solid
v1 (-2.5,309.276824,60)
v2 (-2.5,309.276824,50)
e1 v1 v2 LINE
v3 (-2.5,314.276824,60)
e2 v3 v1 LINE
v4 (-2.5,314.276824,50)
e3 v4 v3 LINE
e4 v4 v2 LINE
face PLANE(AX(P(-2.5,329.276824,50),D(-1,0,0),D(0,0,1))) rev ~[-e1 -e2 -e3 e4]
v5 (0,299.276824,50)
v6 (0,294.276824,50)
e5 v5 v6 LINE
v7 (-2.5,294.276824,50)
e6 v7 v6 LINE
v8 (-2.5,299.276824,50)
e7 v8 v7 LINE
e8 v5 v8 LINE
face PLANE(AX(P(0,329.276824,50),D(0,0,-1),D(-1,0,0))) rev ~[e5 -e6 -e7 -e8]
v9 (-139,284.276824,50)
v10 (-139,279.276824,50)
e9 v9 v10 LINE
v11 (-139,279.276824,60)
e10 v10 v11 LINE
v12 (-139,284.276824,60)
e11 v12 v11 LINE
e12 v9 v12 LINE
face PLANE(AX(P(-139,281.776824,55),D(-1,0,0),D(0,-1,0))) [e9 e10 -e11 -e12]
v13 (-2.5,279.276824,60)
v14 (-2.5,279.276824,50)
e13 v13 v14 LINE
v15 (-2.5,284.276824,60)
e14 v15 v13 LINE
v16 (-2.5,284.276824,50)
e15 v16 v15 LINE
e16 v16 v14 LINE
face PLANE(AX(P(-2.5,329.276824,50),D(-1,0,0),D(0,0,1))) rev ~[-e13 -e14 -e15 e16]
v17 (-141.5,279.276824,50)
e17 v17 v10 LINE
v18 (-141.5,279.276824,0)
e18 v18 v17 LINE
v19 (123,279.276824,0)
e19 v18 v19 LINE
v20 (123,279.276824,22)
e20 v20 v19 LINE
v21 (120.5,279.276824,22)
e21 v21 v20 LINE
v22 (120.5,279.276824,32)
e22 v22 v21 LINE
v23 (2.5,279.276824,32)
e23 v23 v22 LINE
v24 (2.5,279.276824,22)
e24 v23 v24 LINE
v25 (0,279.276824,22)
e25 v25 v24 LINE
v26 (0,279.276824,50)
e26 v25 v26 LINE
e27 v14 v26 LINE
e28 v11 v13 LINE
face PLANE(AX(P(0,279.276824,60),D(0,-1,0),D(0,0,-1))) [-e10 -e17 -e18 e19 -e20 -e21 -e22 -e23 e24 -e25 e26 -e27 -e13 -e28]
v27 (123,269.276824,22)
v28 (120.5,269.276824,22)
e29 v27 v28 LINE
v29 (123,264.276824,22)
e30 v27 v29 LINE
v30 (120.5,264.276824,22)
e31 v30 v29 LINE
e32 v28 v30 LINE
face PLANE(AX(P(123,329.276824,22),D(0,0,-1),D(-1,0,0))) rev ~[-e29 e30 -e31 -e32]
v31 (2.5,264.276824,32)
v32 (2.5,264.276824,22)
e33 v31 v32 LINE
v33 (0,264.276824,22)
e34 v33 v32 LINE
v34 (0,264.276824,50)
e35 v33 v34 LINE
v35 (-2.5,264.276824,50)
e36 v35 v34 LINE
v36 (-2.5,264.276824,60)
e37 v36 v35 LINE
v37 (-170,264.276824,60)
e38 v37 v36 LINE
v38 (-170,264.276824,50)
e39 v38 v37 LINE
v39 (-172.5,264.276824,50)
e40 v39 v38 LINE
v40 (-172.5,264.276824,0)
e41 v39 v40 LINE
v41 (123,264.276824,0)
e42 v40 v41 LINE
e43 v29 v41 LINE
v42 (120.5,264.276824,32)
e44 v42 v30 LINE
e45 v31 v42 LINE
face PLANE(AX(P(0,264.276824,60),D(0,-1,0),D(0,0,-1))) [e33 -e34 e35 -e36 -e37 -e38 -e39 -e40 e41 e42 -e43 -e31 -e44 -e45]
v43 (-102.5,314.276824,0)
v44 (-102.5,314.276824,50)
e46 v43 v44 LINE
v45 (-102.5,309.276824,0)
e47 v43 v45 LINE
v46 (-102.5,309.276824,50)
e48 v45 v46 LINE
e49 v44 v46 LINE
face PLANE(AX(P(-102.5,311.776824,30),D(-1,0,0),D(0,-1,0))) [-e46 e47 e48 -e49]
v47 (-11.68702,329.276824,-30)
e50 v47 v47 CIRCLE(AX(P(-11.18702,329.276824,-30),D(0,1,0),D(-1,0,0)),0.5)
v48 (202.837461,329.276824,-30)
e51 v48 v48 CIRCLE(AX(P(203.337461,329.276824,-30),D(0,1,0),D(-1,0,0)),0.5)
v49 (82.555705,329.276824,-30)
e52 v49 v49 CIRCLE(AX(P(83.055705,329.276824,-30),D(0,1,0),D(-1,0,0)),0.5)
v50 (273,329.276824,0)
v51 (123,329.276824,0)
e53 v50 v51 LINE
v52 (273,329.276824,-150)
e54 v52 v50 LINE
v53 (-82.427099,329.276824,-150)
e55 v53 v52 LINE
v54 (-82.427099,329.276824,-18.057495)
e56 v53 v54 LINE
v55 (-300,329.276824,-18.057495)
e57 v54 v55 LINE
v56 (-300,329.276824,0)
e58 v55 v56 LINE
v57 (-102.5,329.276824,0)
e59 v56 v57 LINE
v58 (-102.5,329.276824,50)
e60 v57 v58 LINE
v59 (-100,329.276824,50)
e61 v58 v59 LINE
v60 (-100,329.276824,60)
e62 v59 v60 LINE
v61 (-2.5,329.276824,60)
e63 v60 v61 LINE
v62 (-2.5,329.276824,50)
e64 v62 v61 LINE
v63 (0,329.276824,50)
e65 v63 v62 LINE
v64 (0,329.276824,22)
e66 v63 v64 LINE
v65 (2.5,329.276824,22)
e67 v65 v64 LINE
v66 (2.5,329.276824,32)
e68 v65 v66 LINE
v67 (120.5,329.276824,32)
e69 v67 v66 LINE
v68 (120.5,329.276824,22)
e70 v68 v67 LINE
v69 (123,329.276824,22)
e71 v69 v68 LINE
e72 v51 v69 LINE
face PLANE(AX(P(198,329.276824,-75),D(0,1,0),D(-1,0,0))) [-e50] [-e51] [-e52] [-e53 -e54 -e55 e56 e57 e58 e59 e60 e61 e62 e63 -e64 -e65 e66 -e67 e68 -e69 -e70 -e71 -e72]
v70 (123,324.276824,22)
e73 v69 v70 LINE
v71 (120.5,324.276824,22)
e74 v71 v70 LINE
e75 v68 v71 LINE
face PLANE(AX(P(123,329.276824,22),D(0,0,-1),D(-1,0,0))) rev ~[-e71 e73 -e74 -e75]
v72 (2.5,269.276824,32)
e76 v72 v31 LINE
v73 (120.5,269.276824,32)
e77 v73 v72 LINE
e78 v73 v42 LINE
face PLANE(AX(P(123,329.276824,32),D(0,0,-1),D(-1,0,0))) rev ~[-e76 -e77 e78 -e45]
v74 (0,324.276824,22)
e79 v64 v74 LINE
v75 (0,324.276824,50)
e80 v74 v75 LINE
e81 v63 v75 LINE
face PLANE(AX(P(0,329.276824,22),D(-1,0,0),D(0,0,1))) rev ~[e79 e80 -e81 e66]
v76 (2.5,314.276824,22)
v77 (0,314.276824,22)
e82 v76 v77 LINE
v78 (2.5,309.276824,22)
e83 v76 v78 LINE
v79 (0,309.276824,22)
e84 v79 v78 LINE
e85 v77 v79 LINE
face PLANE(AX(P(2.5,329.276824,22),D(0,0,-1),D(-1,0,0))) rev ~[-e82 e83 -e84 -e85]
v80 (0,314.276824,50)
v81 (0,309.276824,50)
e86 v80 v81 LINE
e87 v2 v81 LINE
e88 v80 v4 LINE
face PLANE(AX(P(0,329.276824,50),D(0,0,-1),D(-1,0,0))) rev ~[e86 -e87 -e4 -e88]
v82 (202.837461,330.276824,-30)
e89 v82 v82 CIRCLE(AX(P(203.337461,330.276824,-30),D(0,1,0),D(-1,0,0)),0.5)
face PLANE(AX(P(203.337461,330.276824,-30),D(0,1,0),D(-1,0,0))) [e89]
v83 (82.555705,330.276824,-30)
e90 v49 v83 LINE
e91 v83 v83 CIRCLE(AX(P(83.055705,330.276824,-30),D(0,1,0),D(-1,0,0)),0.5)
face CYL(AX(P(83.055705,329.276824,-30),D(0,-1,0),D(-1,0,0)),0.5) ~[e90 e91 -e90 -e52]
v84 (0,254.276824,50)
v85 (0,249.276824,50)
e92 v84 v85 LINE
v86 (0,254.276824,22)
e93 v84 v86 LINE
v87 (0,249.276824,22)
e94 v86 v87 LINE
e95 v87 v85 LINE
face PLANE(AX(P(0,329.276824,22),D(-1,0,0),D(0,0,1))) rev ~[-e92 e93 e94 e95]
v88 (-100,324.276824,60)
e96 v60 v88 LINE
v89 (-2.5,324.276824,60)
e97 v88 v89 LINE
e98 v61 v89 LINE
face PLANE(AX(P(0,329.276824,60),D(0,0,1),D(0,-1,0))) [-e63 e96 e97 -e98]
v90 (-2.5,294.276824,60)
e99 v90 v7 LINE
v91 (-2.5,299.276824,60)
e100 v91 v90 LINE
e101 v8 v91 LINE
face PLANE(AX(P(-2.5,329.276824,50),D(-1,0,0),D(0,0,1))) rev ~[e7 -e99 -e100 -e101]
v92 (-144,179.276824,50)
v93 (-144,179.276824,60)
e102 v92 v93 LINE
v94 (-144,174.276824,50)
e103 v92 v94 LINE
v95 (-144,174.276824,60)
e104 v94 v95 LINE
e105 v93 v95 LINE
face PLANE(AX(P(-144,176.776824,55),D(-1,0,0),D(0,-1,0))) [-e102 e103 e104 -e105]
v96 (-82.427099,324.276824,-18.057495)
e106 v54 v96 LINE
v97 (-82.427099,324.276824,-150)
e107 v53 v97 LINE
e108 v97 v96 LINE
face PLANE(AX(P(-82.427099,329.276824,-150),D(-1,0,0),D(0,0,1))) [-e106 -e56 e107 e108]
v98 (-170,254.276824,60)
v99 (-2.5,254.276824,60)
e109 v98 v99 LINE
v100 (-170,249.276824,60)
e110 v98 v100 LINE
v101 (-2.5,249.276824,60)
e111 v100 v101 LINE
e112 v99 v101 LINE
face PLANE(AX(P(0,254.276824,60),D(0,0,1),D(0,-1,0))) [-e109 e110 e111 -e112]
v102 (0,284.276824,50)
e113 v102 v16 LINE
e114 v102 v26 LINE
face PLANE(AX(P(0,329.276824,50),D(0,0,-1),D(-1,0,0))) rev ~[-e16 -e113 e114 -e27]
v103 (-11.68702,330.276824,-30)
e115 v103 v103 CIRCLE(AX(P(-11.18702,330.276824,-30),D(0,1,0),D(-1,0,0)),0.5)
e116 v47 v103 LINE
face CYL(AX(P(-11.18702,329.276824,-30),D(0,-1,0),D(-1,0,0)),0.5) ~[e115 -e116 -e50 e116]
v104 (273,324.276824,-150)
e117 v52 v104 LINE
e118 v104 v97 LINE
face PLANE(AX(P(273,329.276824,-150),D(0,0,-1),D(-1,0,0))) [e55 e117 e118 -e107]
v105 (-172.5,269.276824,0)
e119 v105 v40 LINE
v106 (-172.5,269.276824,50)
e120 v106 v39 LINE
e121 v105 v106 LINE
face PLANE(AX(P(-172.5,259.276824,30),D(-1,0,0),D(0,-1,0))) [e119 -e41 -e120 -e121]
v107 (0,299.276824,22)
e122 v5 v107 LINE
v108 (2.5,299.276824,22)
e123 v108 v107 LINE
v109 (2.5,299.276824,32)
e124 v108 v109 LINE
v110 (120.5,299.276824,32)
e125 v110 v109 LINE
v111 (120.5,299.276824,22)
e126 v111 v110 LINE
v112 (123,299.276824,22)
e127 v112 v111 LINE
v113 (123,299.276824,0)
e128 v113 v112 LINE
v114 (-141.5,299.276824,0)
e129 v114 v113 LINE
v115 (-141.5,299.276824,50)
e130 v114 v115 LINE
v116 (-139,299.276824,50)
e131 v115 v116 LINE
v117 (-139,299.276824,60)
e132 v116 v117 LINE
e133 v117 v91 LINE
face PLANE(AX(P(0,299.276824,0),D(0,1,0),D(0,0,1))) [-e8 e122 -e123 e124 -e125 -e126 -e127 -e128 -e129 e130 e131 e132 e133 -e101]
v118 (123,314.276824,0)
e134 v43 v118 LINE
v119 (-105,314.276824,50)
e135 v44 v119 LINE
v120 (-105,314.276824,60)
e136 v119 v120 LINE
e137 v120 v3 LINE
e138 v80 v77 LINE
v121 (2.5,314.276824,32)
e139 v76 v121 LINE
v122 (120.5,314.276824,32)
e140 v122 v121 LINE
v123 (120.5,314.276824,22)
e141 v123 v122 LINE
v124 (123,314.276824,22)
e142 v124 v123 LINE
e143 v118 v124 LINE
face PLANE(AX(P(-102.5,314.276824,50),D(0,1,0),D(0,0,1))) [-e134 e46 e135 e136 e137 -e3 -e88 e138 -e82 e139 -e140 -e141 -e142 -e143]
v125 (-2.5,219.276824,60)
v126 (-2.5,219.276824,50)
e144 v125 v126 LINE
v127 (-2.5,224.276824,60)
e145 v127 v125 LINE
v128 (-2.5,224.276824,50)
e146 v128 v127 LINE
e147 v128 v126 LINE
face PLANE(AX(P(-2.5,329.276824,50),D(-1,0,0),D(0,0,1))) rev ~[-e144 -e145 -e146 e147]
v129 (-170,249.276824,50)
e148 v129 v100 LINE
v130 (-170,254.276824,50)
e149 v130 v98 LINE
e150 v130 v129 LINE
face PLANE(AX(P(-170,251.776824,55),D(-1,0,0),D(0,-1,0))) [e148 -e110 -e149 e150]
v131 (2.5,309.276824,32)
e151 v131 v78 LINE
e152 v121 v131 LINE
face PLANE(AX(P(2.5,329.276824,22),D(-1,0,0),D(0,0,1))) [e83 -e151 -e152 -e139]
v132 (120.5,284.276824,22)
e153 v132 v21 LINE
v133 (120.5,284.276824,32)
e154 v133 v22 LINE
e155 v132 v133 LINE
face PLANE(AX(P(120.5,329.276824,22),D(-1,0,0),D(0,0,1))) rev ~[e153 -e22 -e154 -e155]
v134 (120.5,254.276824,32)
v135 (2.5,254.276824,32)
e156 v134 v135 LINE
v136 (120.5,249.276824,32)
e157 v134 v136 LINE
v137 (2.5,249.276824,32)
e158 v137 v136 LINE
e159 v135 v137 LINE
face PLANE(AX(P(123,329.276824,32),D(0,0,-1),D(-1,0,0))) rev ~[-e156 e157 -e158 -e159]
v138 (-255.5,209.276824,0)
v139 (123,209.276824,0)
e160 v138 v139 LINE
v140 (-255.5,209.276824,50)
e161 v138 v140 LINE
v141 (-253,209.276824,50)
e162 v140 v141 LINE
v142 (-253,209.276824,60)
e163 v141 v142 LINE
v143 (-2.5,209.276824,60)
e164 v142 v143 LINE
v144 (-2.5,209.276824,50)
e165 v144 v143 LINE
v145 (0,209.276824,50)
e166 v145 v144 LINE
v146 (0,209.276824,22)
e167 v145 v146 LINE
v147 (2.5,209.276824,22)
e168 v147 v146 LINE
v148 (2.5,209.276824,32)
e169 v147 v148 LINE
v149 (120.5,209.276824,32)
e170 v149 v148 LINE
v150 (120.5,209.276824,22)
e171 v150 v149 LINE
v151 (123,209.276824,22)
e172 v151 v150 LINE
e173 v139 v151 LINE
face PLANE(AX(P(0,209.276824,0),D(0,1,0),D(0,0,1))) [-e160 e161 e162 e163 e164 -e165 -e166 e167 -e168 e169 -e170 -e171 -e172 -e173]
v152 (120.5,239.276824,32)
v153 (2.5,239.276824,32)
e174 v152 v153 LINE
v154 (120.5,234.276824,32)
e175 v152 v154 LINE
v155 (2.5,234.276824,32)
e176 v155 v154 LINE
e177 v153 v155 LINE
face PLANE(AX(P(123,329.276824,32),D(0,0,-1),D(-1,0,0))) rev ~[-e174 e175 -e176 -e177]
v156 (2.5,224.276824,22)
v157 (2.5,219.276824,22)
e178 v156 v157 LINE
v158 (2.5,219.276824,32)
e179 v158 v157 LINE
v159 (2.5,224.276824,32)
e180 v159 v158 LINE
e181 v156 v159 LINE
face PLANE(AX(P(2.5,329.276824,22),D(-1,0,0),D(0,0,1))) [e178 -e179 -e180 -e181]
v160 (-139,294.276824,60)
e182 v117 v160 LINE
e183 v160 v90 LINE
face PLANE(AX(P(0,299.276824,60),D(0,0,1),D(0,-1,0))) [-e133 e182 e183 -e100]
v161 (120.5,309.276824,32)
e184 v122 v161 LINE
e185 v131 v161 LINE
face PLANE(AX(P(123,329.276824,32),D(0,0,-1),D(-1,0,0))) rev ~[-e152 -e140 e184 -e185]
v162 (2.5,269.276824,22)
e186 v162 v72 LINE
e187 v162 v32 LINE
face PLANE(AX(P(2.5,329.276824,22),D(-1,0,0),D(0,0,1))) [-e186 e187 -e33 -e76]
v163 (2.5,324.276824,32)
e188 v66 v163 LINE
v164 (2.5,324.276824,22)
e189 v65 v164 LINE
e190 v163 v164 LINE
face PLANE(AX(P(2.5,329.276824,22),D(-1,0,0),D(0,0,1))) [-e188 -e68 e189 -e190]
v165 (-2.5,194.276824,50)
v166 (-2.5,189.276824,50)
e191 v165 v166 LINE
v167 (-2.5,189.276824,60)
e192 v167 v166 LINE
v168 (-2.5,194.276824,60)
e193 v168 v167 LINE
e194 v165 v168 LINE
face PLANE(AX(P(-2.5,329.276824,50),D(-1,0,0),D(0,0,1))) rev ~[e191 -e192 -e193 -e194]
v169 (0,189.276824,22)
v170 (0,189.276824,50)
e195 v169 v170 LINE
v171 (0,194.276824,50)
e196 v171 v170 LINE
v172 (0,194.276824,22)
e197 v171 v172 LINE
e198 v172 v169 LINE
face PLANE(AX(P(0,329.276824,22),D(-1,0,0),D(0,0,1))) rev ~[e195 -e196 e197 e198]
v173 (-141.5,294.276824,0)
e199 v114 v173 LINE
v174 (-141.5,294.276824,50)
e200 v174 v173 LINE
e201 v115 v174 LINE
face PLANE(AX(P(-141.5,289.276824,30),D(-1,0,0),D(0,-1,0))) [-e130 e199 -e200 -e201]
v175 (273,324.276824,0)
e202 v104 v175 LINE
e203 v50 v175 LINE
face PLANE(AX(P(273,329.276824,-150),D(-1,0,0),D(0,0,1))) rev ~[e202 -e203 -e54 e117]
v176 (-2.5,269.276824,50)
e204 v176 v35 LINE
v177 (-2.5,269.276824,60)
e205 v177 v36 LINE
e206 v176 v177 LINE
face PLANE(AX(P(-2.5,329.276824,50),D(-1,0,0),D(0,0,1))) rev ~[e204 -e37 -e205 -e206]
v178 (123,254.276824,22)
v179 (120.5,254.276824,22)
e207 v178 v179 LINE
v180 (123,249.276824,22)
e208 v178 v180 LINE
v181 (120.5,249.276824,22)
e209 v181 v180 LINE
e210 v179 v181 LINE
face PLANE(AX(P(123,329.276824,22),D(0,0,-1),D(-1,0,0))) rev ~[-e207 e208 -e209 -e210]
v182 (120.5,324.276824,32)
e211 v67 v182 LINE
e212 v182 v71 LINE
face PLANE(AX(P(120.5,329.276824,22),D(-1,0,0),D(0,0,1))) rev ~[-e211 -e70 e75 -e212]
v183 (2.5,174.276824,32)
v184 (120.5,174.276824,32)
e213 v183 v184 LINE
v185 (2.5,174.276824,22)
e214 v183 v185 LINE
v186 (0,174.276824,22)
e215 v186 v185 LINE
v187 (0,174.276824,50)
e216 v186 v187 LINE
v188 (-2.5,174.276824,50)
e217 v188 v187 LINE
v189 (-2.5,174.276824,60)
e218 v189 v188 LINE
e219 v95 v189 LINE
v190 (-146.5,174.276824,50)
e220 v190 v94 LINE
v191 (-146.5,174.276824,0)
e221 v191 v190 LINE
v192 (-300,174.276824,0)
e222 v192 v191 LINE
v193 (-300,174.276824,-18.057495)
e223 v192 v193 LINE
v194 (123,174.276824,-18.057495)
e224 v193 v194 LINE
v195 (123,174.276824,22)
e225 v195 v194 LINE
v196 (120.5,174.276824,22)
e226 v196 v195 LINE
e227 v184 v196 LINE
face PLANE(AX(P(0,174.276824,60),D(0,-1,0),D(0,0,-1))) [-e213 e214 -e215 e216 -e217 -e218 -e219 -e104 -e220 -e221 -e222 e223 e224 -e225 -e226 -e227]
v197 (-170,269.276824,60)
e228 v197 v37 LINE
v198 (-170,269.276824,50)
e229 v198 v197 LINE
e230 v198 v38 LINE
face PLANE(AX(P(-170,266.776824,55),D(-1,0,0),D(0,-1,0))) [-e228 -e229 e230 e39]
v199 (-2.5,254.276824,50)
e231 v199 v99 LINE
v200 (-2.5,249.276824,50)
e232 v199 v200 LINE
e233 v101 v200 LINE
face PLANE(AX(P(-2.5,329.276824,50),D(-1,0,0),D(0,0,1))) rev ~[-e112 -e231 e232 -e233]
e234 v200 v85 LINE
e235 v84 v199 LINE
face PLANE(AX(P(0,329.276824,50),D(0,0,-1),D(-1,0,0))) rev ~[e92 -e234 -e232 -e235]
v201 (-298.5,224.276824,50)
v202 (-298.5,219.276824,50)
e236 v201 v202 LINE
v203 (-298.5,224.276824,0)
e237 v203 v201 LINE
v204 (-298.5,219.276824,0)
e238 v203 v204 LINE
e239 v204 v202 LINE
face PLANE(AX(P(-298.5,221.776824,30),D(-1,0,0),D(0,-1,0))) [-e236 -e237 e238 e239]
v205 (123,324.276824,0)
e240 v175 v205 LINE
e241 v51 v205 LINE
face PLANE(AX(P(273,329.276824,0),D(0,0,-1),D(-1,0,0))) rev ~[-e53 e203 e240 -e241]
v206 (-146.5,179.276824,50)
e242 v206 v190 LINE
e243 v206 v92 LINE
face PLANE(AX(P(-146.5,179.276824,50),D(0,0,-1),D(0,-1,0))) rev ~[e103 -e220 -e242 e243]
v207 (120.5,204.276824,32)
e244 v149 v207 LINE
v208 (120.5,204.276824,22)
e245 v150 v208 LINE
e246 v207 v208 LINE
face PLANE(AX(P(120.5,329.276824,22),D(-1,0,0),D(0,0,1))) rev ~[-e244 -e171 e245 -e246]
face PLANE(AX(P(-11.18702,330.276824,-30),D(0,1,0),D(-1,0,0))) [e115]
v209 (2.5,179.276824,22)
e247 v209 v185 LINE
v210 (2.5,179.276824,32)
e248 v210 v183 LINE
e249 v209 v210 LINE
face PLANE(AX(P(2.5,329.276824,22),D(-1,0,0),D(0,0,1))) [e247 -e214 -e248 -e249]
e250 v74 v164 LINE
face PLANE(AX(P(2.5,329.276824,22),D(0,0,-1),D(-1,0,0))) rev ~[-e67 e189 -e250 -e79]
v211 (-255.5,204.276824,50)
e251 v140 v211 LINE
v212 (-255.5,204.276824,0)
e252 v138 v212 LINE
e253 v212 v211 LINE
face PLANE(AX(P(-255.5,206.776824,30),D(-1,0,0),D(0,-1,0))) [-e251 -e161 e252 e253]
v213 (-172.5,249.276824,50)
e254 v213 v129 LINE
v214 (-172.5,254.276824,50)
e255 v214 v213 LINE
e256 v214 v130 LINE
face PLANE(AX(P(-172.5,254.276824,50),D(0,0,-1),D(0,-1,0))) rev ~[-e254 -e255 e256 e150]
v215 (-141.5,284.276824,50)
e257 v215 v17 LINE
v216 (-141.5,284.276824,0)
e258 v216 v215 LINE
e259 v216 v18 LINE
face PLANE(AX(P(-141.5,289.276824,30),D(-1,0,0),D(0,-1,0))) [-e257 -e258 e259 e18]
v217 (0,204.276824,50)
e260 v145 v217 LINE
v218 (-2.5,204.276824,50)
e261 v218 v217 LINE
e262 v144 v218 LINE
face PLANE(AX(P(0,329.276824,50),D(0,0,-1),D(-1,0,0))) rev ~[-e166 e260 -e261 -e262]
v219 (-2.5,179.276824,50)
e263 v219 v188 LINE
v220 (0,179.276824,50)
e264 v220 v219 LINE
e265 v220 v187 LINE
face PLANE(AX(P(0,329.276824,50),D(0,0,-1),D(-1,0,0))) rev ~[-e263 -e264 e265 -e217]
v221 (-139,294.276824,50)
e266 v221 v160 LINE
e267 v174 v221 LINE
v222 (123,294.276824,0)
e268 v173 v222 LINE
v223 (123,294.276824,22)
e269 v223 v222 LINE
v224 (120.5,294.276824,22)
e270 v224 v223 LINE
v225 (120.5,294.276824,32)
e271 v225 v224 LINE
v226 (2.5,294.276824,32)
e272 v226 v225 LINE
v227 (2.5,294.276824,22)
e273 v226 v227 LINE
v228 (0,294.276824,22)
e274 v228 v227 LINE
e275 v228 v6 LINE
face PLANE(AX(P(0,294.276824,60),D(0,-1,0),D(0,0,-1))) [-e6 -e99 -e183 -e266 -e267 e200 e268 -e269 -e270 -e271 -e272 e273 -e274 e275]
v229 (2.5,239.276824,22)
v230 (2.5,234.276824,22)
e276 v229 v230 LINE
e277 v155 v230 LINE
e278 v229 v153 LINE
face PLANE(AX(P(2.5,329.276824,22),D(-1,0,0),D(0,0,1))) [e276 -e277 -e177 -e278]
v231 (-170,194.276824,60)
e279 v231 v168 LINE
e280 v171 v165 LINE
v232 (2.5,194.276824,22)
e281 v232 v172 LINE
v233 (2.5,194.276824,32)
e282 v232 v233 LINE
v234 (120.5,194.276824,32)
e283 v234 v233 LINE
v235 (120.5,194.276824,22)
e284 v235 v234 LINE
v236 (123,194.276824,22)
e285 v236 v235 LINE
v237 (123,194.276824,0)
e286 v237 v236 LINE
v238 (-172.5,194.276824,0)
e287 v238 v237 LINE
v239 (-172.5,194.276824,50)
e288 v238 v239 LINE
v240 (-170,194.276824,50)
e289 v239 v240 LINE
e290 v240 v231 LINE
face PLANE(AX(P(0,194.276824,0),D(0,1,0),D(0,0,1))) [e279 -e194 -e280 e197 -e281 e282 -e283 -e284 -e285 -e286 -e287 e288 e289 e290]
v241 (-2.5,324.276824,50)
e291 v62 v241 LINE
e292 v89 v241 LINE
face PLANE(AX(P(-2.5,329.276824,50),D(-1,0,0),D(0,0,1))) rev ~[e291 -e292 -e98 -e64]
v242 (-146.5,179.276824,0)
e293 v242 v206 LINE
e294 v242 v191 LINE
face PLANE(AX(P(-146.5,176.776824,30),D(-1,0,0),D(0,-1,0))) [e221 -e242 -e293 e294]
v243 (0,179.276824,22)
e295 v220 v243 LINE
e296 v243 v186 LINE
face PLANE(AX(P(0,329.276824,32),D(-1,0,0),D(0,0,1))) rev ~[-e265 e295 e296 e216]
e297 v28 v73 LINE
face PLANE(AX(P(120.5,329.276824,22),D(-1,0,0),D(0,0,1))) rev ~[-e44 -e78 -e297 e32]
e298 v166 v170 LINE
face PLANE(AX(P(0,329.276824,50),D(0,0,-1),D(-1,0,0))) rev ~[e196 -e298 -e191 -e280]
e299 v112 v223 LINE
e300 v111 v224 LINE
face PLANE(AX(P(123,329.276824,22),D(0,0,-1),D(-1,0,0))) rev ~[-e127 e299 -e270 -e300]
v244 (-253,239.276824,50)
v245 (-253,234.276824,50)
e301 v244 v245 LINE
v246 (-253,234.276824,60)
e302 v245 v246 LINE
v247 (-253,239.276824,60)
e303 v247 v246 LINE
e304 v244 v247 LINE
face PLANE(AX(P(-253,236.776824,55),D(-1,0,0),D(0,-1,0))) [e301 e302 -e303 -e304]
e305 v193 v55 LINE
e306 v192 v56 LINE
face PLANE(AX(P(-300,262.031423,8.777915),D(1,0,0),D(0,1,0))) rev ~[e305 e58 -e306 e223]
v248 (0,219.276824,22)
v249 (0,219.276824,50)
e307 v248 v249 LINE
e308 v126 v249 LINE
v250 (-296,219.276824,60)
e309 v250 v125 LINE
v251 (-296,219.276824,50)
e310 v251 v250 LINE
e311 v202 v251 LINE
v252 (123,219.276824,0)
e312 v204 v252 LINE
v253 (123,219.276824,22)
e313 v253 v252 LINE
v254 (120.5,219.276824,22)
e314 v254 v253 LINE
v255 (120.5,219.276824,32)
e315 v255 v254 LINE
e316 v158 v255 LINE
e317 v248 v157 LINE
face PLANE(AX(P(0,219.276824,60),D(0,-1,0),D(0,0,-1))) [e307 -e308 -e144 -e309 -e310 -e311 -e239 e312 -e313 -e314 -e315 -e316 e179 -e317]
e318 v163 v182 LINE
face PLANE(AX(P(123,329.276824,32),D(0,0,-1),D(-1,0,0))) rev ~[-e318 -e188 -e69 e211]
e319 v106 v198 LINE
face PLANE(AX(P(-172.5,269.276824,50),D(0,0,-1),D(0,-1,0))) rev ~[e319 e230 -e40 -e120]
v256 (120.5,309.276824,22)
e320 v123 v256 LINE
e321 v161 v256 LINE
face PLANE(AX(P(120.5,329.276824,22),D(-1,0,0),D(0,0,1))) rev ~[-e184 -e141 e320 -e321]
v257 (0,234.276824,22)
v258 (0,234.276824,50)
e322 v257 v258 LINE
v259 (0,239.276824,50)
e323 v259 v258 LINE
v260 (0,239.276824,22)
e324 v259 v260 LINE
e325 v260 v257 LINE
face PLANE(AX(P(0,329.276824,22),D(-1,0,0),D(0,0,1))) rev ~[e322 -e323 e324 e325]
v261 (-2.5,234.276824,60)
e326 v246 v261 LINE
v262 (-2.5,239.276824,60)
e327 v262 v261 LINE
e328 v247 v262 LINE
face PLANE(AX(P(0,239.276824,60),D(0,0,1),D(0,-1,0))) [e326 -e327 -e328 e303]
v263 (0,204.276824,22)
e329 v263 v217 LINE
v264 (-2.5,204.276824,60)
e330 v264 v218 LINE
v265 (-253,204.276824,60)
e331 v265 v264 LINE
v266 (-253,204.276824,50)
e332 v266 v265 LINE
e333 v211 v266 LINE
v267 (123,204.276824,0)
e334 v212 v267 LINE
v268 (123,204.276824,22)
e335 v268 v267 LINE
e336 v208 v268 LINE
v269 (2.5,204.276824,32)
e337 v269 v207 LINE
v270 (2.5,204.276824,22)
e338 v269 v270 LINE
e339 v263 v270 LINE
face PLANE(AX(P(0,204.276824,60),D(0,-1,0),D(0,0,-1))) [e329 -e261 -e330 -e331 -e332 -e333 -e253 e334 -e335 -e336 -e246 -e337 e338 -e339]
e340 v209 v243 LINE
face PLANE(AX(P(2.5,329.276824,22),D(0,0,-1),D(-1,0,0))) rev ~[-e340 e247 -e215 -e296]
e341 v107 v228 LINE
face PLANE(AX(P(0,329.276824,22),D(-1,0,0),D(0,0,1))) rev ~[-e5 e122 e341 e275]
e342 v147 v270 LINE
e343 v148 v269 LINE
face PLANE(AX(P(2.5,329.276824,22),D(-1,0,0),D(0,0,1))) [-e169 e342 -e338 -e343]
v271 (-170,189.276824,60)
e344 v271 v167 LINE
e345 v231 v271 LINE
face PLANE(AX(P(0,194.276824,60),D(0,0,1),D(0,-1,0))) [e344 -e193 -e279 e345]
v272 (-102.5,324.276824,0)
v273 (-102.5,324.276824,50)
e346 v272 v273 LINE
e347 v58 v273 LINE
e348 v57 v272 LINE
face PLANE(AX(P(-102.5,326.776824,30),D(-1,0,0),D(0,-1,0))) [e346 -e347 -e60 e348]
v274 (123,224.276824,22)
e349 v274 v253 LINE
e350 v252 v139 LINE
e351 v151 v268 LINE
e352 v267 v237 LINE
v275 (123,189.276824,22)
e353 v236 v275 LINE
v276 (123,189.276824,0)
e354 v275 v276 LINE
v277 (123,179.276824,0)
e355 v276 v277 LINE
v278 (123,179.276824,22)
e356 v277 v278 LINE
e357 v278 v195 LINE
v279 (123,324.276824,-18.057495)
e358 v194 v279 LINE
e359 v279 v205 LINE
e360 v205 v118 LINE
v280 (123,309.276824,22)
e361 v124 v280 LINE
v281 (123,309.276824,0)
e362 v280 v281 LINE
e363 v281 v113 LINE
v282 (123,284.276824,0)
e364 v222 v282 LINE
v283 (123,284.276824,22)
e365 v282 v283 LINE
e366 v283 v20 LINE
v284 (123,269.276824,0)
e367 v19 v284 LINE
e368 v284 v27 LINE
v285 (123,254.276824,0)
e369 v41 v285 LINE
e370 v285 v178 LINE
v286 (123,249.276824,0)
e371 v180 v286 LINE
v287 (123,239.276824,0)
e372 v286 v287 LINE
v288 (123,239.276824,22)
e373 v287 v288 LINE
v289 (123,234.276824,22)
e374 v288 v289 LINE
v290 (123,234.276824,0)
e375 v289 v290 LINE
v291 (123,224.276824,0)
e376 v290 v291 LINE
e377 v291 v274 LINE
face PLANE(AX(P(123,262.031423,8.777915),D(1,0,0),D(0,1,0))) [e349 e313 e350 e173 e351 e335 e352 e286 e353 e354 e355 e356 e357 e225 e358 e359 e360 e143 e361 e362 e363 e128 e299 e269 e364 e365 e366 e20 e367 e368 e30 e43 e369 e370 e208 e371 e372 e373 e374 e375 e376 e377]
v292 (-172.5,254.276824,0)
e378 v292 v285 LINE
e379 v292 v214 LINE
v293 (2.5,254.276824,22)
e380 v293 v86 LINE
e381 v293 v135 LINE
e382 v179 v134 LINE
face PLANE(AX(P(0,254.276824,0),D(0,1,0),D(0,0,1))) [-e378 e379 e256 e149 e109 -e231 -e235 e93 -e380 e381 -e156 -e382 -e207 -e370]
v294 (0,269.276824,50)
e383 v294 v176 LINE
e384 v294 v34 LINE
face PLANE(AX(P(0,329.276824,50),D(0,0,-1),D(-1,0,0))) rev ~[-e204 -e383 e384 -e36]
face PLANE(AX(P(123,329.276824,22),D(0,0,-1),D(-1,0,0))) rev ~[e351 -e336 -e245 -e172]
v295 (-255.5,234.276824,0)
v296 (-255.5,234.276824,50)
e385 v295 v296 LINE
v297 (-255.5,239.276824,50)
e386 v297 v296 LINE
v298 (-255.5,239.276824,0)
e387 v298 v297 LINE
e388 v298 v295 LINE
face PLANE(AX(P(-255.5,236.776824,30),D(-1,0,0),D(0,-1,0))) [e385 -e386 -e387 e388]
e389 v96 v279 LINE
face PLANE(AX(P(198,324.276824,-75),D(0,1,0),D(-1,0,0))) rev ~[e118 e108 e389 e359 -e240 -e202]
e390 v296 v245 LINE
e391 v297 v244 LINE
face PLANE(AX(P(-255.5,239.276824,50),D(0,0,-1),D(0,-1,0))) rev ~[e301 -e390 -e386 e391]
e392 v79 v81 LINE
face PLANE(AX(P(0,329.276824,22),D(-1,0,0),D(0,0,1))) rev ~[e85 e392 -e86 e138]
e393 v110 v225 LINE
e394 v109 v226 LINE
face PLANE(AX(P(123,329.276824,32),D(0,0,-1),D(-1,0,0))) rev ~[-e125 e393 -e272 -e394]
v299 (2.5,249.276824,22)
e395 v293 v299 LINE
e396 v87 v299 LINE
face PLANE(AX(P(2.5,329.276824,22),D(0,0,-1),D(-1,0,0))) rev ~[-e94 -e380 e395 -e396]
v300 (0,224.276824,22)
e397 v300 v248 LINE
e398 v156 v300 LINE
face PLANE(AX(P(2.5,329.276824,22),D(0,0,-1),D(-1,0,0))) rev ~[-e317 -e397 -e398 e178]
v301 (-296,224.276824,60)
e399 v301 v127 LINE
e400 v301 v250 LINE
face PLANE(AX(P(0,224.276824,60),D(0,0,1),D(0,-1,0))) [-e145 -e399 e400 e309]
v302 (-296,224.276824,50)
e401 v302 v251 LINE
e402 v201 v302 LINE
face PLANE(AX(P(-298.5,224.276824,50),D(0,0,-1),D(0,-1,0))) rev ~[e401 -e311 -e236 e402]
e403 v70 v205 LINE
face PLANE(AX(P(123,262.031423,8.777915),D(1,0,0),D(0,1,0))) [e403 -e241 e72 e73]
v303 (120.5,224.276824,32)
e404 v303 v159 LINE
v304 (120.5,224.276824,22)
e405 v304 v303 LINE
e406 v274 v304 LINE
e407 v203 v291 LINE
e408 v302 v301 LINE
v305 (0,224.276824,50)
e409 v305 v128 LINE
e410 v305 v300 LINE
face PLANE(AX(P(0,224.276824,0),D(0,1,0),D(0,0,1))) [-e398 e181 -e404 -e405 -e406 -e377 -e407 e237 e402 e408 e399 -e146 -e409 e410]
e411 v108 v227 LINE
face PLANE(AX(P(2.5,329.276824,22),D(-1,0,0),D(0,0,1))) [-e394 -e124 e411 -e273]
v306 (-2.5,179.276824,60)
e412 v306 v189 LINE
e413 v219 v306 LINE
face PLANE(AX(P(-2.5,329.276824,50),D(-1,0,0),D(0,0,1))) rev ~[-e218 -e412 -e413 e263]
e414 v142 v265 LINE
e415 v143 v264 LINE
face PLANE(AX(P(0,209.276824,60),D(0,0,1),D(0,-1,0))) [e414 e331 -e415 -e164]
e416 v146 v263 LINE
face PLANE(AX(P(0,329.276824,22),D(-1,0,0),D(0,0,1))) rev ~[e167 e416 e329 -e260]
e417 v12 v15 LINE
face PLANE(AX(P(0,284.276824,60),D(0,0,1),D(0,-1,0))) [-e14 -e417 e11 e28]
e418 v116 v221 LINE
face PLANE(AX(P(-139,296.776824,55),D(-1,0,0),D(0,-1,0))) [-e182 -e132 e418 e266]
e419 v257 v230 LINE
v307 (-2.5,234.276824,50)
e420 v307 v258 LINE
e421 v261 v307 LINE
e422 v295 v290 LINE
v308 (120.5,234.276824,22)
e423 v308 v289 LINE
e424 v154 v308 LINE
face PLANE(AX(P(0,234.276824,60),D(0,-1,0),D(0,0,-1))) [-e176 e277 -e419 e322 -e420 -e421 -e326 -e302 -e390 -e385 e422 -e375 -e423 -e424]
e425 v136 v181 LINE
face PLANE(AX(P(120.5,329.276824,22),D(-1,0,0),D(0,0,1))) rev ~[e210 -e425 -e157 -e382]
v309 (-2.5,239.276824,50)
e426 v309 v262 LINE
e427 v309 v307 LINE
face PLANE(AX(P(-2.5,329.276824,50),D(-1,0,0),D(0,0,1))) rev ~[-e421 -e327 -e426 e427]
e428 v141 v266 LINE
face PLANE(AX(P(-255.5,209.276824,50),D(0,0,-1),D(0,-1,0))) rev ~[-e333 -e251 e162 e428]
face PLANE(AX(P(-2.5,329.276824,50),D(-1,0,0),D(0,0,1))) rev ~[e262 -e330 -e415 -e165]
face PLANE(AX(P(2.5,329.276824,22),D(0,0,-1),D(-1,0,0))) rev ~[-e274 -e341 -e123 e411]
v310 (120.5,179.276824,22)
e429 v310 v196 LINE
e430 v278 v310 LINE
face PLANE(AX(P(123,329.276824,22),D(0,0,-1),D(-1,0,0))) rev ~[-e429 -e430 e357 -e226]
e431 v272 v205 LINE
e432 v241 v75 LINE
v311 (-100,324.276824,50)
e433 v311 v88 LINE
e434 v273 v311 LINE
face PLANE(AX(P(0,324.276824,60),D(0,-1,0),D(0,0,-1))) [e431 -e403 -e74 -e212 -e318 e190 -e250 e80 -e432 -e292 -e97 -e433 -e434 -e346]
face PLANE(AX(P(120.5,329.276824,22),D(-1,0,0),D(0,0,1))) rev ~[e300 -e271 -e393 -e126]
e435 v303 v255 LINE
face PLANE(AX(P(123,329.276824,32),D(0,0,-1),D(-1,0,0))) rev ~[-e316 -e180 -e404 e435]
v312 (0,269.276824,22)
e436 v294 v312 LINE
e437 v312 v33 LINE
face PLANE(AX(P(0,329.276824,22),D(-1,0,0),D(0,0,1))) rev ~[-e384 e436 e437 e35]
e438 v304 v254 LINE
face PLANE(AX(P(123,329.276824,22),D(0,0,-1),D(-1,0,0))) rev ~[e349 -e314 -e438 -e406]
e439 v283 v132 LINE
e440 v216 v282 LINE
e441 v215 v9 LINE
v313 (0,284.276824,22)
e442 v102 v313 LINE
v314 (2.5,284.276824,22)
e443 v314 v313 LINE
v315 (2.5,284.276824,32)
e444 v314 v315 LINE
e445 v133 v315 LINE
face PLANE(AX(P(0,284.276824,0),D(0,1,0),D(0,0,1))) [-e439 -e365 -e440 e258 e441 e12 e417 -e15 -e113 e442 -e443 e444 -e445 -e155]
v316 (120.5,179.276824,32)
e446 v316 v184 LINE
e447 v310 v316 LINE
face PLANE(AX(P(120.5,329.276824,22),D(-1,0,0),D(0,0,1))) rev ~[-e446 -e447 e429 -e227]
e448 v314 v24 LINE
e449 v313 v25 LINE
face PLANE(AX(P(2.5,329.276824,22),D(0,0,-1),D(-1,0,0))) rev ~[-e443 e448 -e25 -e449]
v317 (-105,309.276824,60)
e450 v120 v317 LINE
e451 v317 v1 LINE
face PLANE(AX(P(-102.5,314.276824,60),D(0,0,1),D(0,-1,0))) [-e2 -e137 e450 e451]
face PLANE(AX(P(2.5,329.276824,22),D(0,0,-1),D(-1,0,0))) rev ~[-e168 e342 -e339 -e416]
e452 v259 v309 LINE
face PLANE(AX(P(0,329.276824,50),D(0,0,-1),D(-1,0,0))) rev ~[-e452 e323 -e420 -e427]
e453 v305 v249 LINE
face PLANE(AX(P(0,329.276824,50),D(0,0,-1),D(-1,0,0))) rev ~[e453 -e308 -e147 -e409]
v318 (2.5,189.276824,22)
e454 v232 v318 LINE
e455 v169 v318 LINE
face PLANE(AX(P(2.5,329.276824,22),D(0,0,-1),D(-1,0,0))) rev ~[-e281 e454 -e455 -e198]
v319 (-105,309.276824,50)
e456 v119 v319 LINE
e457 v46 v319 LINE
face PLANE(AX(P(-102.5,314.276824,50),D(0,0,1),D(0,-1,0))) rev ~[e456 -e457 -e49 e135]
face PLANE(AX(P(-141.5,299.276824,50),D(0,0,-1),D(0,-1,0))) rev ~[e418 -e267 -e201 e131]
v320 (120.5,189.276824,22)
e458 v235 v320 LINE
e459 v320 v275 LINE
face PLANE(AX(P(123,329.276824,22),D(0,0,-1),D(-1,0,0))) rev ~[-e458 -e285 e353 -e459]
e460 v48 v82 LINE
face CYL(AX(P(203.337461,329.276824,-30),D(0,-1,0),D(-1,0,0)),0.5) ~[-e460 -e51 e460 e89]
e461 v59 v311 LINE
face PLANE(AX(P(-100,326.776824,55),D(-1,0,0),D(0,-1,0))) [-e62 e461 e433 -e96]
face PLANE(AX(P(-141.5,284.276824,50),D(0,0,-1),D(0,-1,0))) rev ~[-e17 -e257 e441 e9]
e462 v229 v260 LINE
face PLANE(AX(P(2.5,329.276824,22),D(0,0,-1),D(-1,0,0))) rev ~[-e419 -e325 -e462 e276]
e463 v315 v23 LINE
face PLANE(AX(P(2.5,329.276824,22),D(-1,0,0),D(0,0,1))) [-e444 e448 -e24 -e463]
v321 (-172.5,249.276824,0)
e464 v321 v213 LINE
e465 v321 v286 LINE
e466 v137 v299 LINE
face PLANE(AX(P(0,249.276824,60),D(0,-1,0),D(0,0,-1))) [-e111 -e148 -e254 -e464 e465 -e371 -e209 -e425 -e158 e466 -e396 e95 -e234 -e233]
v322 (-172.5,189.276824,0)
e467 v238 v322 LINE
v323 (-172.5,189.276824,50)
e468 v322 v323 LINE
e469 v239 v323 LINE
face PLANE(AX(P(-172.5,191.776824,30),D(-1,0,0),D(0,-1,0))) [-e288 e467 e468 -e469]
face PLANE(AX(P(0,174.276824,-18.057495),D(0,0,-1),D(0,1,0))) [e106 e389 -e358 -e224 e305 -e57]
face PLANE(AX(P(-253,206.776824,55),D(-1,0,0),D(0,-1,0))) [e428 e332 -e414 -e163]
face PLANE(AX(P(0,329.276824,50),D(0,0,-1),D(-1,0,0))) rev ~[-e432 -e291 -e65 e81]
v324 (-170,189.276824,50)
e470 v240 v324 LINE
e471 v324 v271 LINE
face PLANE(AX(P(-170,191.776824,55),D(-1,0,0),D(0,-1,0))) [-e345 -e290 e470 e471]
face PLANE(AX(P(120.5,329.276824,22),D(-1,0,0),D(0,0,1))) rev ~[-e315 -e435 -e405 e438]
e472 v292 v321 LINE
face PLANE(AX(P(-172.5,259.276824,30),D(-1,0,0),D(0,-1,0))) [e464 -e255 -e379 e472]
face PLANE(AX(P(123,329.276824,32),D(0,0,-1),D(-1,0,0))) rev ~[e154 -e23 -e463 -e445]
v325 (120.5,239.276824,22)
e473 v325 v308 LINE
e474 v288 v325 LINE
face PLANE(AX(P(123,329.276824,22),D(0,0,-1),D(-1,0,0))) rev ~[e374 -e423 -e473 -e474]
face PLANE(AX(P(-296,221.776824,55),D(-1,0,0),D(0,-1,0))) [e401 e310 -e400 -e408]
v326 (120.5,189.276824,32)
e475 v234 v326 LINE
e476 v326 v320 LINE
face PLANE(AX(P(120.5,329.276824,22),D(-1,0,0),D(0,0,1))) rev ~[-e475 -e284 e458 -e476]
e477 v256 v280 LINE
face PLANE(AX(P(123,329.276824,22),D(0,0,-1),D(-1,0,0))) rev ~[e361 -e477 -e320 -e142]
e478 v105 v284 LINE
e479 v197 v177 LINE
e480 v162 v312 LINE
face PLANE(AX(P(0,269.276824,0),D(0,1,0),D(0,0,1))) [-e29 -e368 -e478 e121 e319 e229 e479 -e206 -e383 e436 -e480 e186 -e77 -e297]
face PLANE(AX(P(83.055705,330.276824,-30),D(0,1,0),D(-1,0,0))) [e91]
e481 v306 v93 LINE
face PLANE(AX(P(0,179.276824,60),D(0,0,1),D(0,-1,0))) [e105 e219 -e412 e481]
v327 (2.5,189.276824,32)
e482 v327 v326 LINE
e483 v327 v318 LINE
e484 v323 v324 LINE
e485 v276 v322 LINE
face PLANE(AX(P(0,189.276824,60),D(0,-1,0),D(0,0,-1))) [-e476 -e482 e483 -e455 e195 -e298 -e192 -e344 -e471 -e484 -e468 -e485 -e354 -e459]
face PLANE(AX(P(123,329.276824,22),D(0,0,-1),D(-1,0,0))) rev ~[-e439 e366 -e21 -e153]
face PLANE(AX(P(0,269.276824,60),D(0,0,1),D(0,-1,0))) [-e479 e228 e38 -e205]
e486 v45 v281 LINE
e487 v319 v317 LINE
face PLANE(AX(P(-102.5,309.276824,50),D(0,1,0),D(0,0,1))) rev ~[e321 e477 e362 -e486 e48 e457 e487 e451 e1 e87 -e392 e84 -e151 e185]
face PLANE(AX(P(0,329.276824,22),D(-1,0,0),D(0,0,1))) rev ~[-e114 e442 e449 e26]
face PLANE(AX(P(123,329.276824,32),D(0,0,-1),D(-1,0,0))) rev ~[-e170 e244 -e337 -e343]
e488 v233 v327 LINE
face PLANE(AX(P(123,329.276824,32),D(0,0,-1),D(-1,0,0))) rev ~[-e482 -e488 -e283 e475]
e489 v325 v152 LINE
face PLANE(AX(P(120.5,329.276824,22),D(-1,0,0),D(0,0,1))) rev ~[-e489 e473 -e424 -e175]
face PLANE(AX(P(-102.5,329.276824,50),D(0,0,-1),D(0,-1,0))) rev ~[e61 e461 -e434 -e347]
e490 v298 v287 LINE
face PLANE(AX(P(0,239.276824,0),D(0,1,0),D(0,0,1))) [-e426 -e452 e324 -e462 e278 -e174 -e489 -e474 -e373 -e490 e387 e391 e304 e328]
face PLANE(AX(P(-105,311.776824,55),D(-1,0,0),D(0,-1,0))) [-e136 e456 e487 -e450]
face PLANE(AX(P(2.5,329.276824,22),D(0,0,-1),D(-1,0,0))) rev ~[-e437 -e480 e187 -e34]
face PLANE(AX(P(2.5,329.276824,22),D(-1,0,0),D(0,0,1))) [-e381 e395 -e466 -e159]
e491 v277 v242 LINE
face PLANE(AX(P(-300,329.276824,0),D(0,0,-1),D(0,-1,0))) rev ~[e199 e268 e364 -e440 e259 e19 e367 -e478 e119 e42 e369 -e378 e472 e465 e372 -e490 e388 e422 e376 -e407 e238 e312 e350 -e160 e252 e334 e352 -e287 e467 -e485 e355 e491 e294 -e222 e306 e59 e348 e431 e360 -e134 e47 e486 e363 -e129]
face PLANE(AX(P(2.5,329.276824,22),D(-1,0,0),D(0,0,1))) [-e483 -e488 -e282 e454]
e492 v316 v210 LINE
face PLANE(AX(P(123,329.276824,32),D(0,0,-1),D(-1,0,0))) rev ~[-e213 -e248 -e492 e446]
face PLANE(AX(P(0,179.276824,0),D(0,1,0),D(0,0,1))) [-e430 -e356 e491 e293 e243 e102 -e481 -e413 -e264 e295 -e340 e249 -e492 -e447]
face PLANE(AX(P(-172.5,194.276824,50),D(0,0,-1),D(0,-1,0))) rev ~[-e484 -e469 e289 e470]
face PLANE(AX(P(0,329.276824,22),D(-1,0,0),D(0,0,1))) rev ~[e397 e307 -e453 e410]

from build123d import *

# Parameters (mm, degrees)
F1_DEPTH  = 123
F2_DEPTH  = 300
F3_R      = 0.5
F4_DEPTH  = 1
F5_W      = 123
F5_H      = 28
F6_DEPTH  = 300
F7_W      = 2.5
F7_H      = 10
F8_DEPTH  = 300
F9_W      = 150
F9_H      = 150
F10_DEPTH = 5
F11_W     = 5
F11_H     = 60
F12_DEPTH = 197.5
F13_W     = 20
F13_H     = 60
F14_DEPTH = 158.5
F15_W     = 20
F15_H     = 60
F15_W_2   = 5
F16_DEPTH = 127.5
F17_W     = 5
F17_H     = 60
F18_DEPTH = 44.5
F19_W     = 5
F19_H     = 60
F20_DEPTH = 1.5
F21_W     = 5
F21_H     = 60
F22_DEPTH = 153.5
F23_W     = 5
F23_H     = 10
F24_DEPTH = 2.5
F25_W     = 5
F25_H     = 10
F26_DEPTH = 2.5
F27_W     = 5
F27_H     = 10
F28_DEPTH = 2.5
F29_W     = 5
F29_H     = 10
F30_DEPTH = 2.5
F31_W     = 5
F31_H     = 10
F32_DEPTH = 2.5
F33_W     = 5
F33_H     = 10
F34_DEPTH = 2.5
F35_W     = 5
F35_H     = 10
F36_DEPTH = 2.5
F37_W     = 5
F37_H     = 10
F38_DEPTH = 2.5
F39_W     = 5
F39_H     = 10
F40_DEPTH = 2.5
F41_W     = 5
F41_H     = 10
F42_DEPTH = 2.5
F43_W     = 5
F43_H     = 10
F44_DEPTH = 2.5
F45_W     = 217.5729006529
F45_H     = 131.9425046444
F46_DEPTH = 5


# Not quite as in the source:
# - a feature names something its author has since deleted; it is built from what else it names


with BuildPart() as f1:
    # F0 (on Right) → F1 (new body)
    with BuildSketch(Plane.YZ):
        Polygon((179.2768240368, 60), (174.2768240368, 60), (174.2768240368, -18.0574953556), (324.2768240368, -18.0574953556), (324.2768240368, -150), (329.2768240368, -150), (329.2768240368, 60), (324.2768240368, 60), (324.2768240368, 0), (314.2768240368, 0), (314.2768240368, 60), (309.2768240368, 60), (309.2768240368, 0), (299.2768240368, 0), (299.2768240368, 60), (294.2768240368, 60), (294.2768240368, 0), (284.2768240368, 0), (284.2768240368, 60), (279.2768240368, 60), (279.2768240368, 0), (269.2768240368, 0), (269.2768240368, 60), (264.2768240368, 60), (264.2768240368, 0), (254.2768240368, 0), (254.2768240368, 60), (249.2768240368, 60), (249.2768240368, 0), (239.2768240368, 0), (239.2768240368, 60), (234.2768240368, 60), (234.2768240368, 0), (224.2768240368, 0), (224.2768240368, 60), (219.2768240368, 60), (219.2768240368, 0), (209.2768240368, 0), (209.2768240368, 60), (204.2768240368, 60), (204.2768240368, 0), (194.2768240368, 0), (194.2768240368, 60), (189.2768240368, 60), (189.2768240368, 0), (179.2768240368, 0), align=None)
    extrude(amount=F1_DEPTH)

    # F0 (on Right) → F2 (join)
    with BuildSketch(Plane.YZ):
        Polygon((179.2768240368, 60), (174.2768240368, 60), (174.2768240368, -18.0574953556), (324.2768240368, -18.0574953556), (324.2768240368, -150), (329.2768240368, -150), (329.2768240368, 60), (324.2768240368, 60), (324.2768240368, 0), (314.2768240368, 0), (314.2768240368, 60), (309.2768240368, 60), (309.2768240368, 0), (299.2768240368, 0), (299.2768240368, 60), (294.2768240368, 60), (294.2768240368, 0), (284.2768240368, 0), (284.2768240368, 60), (279.2768240368, 60), (279.2768240368, 0), (269.2768240368, 0), (269.2768240368, 60), (264.2768240368, 60), (264.2768240368, 0), (254.2768240368, 0), (254.2768240368, 60), (249.2768240368, 60), (249.2768240368, 0), (239.2768240368, 0), (239.2768240368, 60), (234.2768240368, 60), (234.2768240368, 0), (224.2768240368, 0), (224.2768240368, 60), (219.2768240368, 60), (219.2768240368, 0), (209.2768240368, 0), (209.2768240368, 60), (204.2768240368, 60), (204.2768240368, 0), (194.2768240368, 0), (194.2768240368, 60), (189.2768240368, 60), (189.2768240368, 0), (179.2768240368, 0), align=None)
    extrude(amount=-F2_DEPTH)

    # F3 (on face) → F4, piece 2 (join)
    with BuildSketch(Plane(origin=(0, 329.2768240368, 0), x_dir=(-1, 0, 0), z_dir=(0, 1, 0))):
        with Locations((-83.0557048321, -30)):
            Circle(F3_R)
        with Locations((11.1870197579, -30)):
            Circle(F3_R)
    extrude(amount=F4_DEPTH)

    # F5 (on face) → F6 (cut)
    with BuildSketch(Plane(origin=(0, 329.2768240368, 0), x_dir=(-1, 0, 0), z_dir=(0, 1, 0))):
        with Locations((-61.5, 46)):
            Rectangle(F5_W, F5_H)
    extrude(amount=-F6_DEPTH, mode=Mode.SUBTRACT)

    # F7 (on face) → F8 (cut)
    with BuildSketch(Plane(origin=(0, 329.2768240368, 0), x_dir=(-1, 0, 0), z_dir=(0, 1, 0))):
        with Locations((-1.25, 27)):
            Rectangle(F7_W, F7_H)
        with Locations((1.25, 55)):
            Rectangle(F7_W, F7_H)
        with Locations((-121.75, 27)):
            Rectangle(F7_W, F7_H)
    extrude(amount=-F8_DEPTH, mode=Mode.SUBTRACT)



with BuildPart() as f4:
    # F3 (on face) → F4 (new body)
    with BuildSketch(Plane(origin=(0, 329.2768240368, 0), x_dir=(-1, 0, 0), z_dir=(0, 1, 0))):
        with Locations((-203.3374607563, -30)):
            Circle(F3_R)
    extrude(amount=F4_DEPTH)


with BuildPart() as f1_1:
    add(f1.part)

    add(f4.part)  # F10 merges F4
    # F9 (on face) → F10 (join)
    with BuildSketch(Plane(origin=(0, 329.2768240368, 0), x_dir=(-1, 0, 0), z_dir=(0, 1, 0))):
        with Locations((-198, -75)):
            Rectangle(F9_W, F9_H)
    extrude(amount=-F10_DEPTH)

    # F11 (on face) → F12 (cut)
    with BuildSketch(Plane(origin=(-300, 0, 0), x_dir=(0, -1, 0), z_dir=(-1, 0, 0))):
        with Locations((-326.7768240368, 30)):
            Rectangle(F11_W, F11_H)
        with Locations((-311.7768240368, 30)):
            Rectangle(F11_W, F11_H)
    extrude(amount=-F12_DEPTH, mode=Mode.SUBTRACT)

    # F13 (on face) → F14 (cut)
    with BuildSketch(Plane(origin=(-300, 0, 0), x_dir=(0, -1, 0), z_dir=(-1, 0, 0))):
        with Locations((-289.2768240368, 30)):
            Rectangle(F13_W, F13_H)
    extrude(amount=-F14_DEPTH, mode=Mode.SUBTRACT)

    # F15 (on face) → F16 (cut)
    with BuildSketch(Plane(origin=(-300, 0, 0), x_dir=(0, -1, 0), z_dir=(-1, 0, 0))):
        with Locations((-259.2768240368, 30)):
            Rectangle(F15_W, F15_H)
        with Locations((-191.7768240368, 30)):
            Rectangle(F15_W_2, F15_H)
    extrude(amount=-F16_DEPTH, mode=Mode.SUBTRACT)

    # F17 (on face) → F18 (cut)
    with BuildSketch(Plane(origin=(-300, 0, 0), x_dir=(0, -1, 0), z_dir=(-1, 0, 0))):
        with Locations((-236.7768240368, 30)):
            Rectangle(F17_W, F17_H)
        with Locations((-206.7768240368, 30)):
            Rectangle(F17_W, F17_H)
    extrude(amount=-F18_DEPTH, mode=Mode.SUBTRACT)

    # F19 (on face) → F20 (cut)
    with BuildSketch(Plane(origin=(-300, 0, 0), x_dir=(0, -1, 0), z_dir=(-1, 0, 0))):
        with Locations((-221.7768240368, 30)):
            Rectangle(F19_W, F19_H)
    extrude(amount=-F20_DEPTH, mode=Mode.SUBTRACT)

    # F21 (on face) → F22 (cut)
    with BuildSketch(Plane(origin=(-300, 0, 0), x_dir=(0, -1, 0), z_dir=(-1, 0, 0))):
        with Locations((-176.7768240368, 30)):
            Rectangle(F21_W, F21_H)
    extrude(amount=-F22_DEPTH, mode=Mode.SUBTRACT)

    # F23 (on face) → F24 (cut)
    with BuildSketch(Plane(origin=(-298.5, 0, 0), x_dir=(0, -1, 0), z_dir=(-1, 0, 0))):
        with Locations((-221.7768240368, 55)):
            Rectangle(F23_W, F23_H)
    extrude(amount=-F24_DEPTH, mode=Mode.SUBTRACT)

    # F25 (on face) → F26 (cut)
    with BuildSketch(Plane(origin=(-255.5, 0, 0), x_dir=(0, -1, 0), z_dir=(-1, 0, 0))):
        with Locations((-236.7768240368, 55)):
            Rectangle(F25_W, F25_H)
    extrude(amount=-F26_DEPTH, mode=Mode.SUBTRACT)

    # F27 (on face) → F28 (cut)
    with BuildSketch(Plane(origin=(-255.5, 0, 0), x_dir=(0, -1, 0), z_dir=(-1, 0, 0))):
        with Locations((-206.7768240368, 55)):
            Rectangle(F27_W, F27_H)
    extrude(amount=-F28_DEPTH, mode=Mode.SUBTRACT)

    # F29 (on face) → F30 (cut)
    with BuildSketch(Plane(origin=(-172.5, 0, 0), x_dir=(0, -1, 0), z_dir=(-1, 0, 0))):
        with Locations((-251.7768240368, 55)):
            Rectangle(F29_W, F29_H)
    extrude(amount=-F30_DEPTH, mode=Mode.SUBTRACT)

    # F31 (on face) → F32 (cut)
    with BuildSketch(Plane(origin=(-172.5, 0, 0), x_dir=(0, -1, 0), z_dir=(-1, 0, 0))):
        with Locations((-191.7768240368, 55)):
            Rectangle(F31_W, F31_H)
    extrude(amount=-F32_DEPTH, mode=Mode.SUBTRACT)

    # F33 (on face) → F34 (cut)
    with BuildSketch(Plane(origin=(-172.5, 0, 0), x_dir=(0, -1, 0), z_dir=(-1, 0, 0))):
        with Locations((-266.7768240368, 55)):
            Rectangle(F33_W, F33_H)
    extrude(amount=-F34_DEPTH, mode=Mode.SUBTRACT)

    # F35 (on face) → F36 (cut)
    with BuildSketch(Plane(origin=(-146.5, 0, 0), x_dir=(0, -1, 0), z_dir=(-1, 0, 0))):
        with Locations((-176.7768240368, 55)):
            Rectangle(F35_W, F35_H)
    extrude(amount=-F36_DEPTH, mode=Mode.SUBTRACT)

    # F37 (on face) → F38 (cut)
    with BuildSketch(Plane(origin=(-141.5, 0, 0), x_dir=(0, -1, 0), z_dir=(-1, 0, 0))):
        with Locations((-281.7768240368, 55)):
            Rectangle(F37_W, F37_H)
    extrude(amount=-F38_DEPTH, mode=Mode.SUBTRACT)

    # F39 (on face) → F40 (cut)
    with BuildSketch(Plane(origin=(-141.5, 0, 0), x_dir=(0, -1, 0), z_dir=(-1, 0, 0))):
        with Locations((-296.7768240368, 55)):
            Rectangle(F39_W, F39_H)
    extrude(amount=-F40_DEPTH, mode=Mode.SUBTRACT)

    # F41 (on face) → F42 (join)
    with BuildSketch(Plane(origin=(-102.5, 0, 0), x_dir=(0, -1, 0), z_dir=(-1, 0, 0))):
        with Locations((-311.7768240368, 55)):
            Rectangle(F41_W, F41_H)
    extrude(amount=F42_DEPTH)

    # F43 (on face) → F44 (cut)
    with BuildSketch(Plane(origin=(-102.5, 0, 0), x_dir=(0, -1, 0), z_dir=(-1, 0, 0))):
        with Locations((-326.7768240368, 55)):
            Rectangle(F43_W, F43_H)
    extrude(amount=-F44_DEPTH, mode=Mode.SUBTRACT)

    # F45 (on face) → F46 (cut)
    with BuildSketch(Plane(origin=(0, 329.2768240368, 0), x_dir=(-1, 0, 0), z_dir=(0, 1, 0))):
        with Locations((191.2135496736, -84.0287476778)):
            Rectangle(F45_W, F45_H)
    extrude(amount=-F46_DEPTH, mode=Mode.SUBTRACT)


solid = f1_1.part
